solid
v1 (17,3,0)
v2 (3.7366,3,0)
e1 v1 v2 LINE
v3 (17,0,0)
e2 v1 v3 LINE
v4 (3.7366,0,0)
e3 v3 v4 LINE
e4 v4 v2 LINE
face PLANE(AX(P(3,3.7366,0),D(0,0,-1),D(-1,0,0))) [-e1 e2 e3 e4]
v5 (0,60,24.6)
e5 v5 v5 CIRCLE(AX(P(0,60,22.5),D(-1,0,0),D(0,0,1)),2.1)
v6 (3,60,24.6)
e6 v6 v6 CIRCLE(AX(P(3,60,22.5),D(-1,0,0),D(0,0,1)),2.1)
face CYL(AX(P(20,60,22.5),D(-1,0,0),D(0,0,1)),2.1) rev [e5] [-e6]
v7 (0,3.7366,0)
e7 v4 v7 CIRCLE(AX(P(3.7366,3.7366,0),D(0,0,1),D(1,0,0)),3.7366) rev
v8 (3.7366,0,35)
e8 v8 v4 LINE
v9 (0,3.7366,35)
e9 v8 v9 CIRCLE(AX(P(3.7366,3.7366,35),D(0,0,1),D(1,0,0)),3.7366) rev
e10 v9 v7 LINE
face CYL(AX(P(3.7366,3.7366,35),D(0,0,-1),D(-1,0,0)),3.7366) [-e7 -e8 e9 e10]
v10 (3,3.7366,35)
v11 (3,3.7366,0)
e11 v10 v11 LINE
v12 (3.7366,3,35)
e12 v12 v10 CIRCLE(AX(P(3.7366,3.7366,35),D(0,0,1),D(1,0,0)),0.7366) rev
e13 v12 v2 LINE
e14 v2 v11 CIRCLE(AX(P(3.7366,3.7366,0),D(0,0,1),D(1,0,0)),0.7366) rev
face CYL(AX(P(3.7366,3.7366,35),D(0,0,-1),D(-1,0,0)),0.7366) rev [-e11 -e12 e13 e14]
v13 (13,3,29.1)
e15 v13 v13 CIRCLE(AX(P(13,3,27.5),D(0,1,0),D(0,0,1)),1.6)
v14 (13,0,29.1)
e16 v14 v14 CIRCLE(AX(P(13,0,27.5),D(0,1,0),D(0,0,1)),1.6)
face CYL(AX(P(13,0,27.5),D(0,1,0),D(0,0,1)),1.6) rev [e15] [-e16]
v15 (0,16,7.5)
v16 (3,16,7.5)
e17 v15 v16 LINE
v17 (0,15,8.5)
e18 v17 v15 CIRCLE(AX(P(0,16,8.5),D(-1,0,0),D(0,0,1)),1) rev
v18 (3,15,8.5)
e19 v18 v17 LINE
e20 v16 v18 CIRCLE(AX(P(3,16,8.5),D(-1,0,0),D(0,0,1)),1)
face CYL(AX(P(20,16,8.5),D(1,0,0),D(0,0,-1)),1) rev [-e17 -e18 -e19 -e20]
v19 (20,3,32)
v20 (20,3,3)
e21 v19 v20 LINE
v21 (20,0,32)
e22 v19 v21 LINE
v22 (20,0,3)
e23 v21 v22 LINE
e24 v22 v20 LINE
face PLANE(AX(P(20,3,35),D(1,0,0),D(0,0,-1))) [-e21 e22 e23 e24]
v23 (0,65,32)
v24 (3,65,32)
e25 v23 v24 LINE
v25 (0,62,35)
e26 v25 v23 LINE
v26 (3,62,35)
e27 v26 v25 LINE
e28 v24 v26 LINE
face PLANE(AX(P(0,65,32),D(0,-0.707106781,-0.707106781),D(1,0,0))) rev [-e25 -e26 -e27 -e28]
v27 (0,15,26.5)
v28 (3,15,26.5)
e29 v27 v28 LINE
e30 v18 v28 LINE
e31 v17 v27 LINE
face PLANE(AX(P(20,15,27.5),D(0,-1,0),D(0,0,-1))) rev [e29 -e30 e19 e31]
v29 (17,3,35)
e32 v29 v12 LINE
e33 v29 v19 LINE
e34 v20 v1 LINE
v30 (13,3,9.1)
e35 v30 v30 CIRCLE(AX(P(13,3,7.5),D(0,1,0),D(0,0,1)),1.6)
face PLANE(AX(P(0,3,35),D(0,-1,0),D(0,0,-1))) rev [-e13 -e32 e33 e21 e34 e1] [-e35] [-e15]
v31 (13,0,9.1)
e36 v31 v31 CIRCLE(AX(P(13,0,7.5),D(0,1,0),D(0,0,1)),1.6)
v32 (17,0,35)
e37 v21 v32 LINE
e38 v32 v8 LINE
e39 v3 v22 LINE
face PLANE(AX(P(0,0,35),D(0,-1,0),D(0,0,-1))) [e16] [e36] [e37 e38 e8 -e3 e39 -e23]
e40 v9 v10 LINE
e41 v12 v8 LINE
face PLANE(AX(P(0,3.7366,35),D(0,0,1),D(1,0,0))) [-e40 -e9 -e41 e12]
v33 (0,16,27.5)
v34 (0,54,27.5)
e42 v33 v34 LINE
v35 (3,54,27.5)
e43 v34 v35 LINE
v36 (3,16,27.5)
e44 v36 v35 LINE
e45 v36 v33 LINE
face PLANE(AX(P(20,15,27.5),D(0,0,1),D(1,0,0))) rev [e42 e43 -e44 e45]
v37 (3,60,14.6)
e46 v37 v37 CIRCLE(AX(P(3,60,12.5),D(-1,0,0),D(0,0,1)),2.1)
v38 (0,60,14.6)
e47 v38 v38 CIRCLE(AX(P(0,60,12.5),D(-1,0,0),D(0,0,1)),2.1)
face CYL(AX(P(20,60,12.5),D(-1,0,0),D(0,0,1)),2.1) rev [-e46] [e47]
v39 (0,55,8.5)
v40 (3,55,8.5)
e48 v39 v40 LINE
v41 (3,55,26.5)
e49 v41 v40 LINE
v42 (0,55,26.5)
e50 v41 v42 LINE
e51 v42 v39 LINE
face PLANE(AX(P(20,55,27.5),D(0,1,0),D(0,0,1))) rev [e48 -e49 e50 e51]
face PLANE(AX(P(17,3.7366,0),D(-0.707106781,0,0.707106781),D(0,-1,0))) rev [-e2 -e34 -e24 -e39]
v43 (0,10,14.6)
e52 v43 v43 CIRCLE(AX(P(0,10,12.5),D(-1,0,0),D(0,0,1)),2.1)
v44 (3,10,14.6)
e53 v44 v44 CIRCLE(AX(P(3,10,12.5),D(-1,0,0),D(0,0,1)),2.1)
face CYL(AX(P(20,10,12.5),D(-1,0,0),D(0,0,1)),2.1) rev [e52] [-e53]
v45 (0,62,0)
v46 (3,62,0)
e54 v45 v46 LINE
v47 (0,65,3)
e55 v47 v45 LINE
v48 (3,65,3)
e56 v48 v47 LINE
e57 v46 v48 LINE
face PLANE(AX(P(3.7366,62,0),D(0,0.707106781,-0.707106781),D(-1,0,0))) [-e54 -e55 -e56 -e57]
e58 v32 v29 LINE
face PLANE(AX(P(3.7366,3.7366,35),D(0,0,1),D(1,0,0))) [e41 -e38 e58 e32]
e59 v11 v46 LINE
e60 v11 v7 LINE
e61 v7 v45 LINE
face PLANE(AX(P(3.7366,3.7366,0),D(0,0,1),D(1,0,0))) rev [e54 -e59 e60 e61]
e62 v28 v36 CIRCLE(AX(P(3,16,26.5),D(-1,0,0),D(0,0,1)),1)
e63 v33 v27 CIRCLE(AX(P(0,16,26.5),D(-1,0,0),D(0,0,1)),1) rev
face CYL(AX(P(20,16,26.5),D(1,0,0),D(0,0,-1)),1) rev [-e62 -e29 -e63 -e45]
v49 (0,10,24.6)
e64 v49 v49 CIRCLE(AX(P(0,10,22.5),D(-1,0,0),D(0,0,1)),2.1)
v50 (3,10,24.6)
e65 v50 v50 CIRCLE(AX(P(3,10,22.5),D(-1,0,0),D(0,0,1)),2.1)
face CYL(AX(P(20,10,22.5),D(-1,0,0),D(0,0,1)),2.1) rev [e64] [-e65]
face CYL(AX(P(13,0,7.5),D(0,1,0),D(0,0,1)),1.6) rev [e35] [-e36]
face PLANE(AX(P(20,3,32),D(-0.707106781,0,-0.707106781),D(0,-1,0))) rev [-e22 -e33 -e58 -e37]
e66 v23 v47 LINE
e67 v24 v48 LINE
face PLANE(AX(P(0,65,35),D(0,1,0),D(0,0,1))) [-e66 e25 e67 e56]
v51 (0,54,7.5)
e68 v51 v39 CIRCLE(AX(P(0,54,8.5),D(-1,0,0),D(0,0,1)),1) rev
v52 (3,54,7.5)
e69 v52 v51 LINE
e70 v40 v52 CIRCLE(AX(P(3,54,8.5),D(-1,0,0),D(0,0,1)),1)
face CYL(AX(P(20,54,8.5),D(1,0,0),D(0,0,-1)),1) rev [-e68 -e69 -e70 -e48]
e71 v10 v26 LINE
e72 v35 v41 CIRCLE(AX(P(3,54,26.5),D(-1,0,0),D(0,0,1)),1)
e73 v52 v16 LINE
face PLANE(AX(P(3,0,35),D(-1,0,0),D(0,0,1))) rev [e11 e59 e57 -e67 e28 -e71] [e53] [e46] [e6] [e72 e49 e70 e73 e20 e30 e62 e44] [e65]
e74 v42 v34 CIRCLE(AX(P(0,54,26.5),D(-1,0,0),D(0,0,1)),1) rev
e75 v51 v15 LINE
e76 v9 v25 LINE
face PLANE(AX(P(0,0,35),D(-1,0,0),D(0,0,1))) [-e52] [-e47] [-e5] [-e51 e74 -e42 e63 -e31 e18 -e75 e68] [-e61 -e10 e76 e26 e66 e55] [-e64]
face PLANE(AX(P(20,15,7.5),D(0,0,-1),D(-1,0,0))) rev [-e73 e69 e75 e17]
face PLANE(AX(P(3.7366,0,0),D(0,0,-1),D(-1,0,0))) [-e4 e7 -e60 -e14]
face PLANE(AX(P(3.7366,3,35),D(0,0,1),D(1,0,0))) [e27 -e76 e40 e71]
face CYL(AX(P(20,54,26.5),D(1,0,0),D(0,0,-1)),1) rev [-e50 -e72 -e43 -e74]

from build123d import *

# Parameters (mm, degrees)
SM_BASE_FLANGE_1_DEPTH      = 35
SKETCH_2_R                  = 1.6
CUT_EXTRUDE_1_DEPTH         = 74.952687578
PATTERN_LINEAR_1_COUNT      = 2
PATTERN_LINEAR_1_PITCH      = 20
CHAMFER_1_SIZE              = 3
SKETCH_3_R                  = 2.1
CUT_EXTRUDE_2_DEPTH         = 77.485292704
PATTERN_LINEAR_2_COUNT      = 2
PATTERN_LINEAR_2_PITCH      = 10
PATTERN_LINEAR_2_COUNT_DIR2 = 2
PATTERN_LINEAR_2_PITCH_DIR2 = 50
SKETCH_4_W                  = 20
SKETCH_4_H                  = 40
CUT_EXTRUDE_3_DEPTH         = 77.485292704
FILLET_1_R                  = 1


# Sheet-metal steps are written as plain solids
with BuildPart() as part:
    # Sketch 1 → 基材-凸緣1 (new body)
    with BuildSketch(Plane.XY):
        with BuildLine():
            Line((0, 65), (0, 3.7366))
            ThreePointArc((0, 3.7366), (1.094424801, 1.094424801), (3.7366, 0))
            Line((3.7366, 0), (20, 0))
            Line((20, 0), (20, 3))
            Line((20, 3), (3.7366, 3))
            ThreePointArc((3.7366, 3), (3.215745145, 3.215745145), (3, 3.7366))
            Line((3, 3.7366), (3, 65))
            Line((3, 65), (0, 65))
        make_face()
    extrude(amount=SM_BASE_FLANGE_1_DEPTH)

    # Sketch 2 → 除料-伸長1 (cut, through all)
    with BuildSketch(Plane(origin=(0, 3, 0), x_dir=(1, 0, 0), z_dir=(0, 1, 0))):
        with Locations(Location((13, -7.5, 0), (0, 0, 270))):
            Circle(SKETCH_2_R)
    cut_extrude_1 = extrude(amount=-CUT_EXTRUDE_1_DEPTH, mode=Mode.SUBTRACT)

    # 直線複製排列1: 除料-伸長1 ×2
    with Locations(*[(0, 0, i * PATTERN_LINEAR_1_PITCH) for i in range(1, PATTERN_LINEAR_1_COUNT)]):
        add(cut_extrude_1, mode=Mode.SUBTRACT)

    # 導角1
    chamfer_1_edges = [part.edges().sort_by_distance(p)[0] for p in [
        (20, 1.5, 35),
        (20, 1.5, 0),
        (1.5, 65, 35),
        (1.5, 65, 0),
    ]]
    chamfer(chamfer_1_edges, length=CHAMFER_1_SIZE)

    # 草圖3 → 除料-伸長2 (cut, through all)
    with BuildSketch(Plane.ZY):
        with Locations((12.5, 60)):
            Circle(SKETCH_3_R)
    cut_extrude_2 = extrude(amount=-CUT_EXTRUDE_2_DEPTH, mode=Mode.SUBTRACT)

    # 直線複製排列2: Cut-Extrude 2 2 × 2
    with Locations(*[(0, -j * PATTERN_LINEAR_2_PITCH_DIR2, i * PATTERN_LINEAR_2_PITCH) for i in range(PATTERN_LINEAR_2_COUNT) for j in range(PATTERN_LINEAR_2_COUNT_DIR2) if (i, j) != (0, 0)]):
        add(cut_extrude_2, mode=Mode.SUBTRACT)

    # 草圖4 → 除料-伸長3 (cut, through all)
    with BuildSketch(Plane.ZY):
        with Locations((17.5, 35)):
            Rectangle(SKETCH_4_W, SKETCH_4_H)
    extrude(amount=-CUT_EXTRUDE_3_DEPTH, mode=Mode.SUBTRACT)

    # 圓角1
    fillet_1_edges = [part.edges().sort_by_distance(p)[0] for p in [
        (1.5, 15, 7.5),
        (1.5, 55, 7.5),
        (1.5, 55, 27.5),
        (1.5, 15, 27.5),
    ]]
    fillet(fillet_1_edges, radius=FILLET_1_R)


solid = part.part
